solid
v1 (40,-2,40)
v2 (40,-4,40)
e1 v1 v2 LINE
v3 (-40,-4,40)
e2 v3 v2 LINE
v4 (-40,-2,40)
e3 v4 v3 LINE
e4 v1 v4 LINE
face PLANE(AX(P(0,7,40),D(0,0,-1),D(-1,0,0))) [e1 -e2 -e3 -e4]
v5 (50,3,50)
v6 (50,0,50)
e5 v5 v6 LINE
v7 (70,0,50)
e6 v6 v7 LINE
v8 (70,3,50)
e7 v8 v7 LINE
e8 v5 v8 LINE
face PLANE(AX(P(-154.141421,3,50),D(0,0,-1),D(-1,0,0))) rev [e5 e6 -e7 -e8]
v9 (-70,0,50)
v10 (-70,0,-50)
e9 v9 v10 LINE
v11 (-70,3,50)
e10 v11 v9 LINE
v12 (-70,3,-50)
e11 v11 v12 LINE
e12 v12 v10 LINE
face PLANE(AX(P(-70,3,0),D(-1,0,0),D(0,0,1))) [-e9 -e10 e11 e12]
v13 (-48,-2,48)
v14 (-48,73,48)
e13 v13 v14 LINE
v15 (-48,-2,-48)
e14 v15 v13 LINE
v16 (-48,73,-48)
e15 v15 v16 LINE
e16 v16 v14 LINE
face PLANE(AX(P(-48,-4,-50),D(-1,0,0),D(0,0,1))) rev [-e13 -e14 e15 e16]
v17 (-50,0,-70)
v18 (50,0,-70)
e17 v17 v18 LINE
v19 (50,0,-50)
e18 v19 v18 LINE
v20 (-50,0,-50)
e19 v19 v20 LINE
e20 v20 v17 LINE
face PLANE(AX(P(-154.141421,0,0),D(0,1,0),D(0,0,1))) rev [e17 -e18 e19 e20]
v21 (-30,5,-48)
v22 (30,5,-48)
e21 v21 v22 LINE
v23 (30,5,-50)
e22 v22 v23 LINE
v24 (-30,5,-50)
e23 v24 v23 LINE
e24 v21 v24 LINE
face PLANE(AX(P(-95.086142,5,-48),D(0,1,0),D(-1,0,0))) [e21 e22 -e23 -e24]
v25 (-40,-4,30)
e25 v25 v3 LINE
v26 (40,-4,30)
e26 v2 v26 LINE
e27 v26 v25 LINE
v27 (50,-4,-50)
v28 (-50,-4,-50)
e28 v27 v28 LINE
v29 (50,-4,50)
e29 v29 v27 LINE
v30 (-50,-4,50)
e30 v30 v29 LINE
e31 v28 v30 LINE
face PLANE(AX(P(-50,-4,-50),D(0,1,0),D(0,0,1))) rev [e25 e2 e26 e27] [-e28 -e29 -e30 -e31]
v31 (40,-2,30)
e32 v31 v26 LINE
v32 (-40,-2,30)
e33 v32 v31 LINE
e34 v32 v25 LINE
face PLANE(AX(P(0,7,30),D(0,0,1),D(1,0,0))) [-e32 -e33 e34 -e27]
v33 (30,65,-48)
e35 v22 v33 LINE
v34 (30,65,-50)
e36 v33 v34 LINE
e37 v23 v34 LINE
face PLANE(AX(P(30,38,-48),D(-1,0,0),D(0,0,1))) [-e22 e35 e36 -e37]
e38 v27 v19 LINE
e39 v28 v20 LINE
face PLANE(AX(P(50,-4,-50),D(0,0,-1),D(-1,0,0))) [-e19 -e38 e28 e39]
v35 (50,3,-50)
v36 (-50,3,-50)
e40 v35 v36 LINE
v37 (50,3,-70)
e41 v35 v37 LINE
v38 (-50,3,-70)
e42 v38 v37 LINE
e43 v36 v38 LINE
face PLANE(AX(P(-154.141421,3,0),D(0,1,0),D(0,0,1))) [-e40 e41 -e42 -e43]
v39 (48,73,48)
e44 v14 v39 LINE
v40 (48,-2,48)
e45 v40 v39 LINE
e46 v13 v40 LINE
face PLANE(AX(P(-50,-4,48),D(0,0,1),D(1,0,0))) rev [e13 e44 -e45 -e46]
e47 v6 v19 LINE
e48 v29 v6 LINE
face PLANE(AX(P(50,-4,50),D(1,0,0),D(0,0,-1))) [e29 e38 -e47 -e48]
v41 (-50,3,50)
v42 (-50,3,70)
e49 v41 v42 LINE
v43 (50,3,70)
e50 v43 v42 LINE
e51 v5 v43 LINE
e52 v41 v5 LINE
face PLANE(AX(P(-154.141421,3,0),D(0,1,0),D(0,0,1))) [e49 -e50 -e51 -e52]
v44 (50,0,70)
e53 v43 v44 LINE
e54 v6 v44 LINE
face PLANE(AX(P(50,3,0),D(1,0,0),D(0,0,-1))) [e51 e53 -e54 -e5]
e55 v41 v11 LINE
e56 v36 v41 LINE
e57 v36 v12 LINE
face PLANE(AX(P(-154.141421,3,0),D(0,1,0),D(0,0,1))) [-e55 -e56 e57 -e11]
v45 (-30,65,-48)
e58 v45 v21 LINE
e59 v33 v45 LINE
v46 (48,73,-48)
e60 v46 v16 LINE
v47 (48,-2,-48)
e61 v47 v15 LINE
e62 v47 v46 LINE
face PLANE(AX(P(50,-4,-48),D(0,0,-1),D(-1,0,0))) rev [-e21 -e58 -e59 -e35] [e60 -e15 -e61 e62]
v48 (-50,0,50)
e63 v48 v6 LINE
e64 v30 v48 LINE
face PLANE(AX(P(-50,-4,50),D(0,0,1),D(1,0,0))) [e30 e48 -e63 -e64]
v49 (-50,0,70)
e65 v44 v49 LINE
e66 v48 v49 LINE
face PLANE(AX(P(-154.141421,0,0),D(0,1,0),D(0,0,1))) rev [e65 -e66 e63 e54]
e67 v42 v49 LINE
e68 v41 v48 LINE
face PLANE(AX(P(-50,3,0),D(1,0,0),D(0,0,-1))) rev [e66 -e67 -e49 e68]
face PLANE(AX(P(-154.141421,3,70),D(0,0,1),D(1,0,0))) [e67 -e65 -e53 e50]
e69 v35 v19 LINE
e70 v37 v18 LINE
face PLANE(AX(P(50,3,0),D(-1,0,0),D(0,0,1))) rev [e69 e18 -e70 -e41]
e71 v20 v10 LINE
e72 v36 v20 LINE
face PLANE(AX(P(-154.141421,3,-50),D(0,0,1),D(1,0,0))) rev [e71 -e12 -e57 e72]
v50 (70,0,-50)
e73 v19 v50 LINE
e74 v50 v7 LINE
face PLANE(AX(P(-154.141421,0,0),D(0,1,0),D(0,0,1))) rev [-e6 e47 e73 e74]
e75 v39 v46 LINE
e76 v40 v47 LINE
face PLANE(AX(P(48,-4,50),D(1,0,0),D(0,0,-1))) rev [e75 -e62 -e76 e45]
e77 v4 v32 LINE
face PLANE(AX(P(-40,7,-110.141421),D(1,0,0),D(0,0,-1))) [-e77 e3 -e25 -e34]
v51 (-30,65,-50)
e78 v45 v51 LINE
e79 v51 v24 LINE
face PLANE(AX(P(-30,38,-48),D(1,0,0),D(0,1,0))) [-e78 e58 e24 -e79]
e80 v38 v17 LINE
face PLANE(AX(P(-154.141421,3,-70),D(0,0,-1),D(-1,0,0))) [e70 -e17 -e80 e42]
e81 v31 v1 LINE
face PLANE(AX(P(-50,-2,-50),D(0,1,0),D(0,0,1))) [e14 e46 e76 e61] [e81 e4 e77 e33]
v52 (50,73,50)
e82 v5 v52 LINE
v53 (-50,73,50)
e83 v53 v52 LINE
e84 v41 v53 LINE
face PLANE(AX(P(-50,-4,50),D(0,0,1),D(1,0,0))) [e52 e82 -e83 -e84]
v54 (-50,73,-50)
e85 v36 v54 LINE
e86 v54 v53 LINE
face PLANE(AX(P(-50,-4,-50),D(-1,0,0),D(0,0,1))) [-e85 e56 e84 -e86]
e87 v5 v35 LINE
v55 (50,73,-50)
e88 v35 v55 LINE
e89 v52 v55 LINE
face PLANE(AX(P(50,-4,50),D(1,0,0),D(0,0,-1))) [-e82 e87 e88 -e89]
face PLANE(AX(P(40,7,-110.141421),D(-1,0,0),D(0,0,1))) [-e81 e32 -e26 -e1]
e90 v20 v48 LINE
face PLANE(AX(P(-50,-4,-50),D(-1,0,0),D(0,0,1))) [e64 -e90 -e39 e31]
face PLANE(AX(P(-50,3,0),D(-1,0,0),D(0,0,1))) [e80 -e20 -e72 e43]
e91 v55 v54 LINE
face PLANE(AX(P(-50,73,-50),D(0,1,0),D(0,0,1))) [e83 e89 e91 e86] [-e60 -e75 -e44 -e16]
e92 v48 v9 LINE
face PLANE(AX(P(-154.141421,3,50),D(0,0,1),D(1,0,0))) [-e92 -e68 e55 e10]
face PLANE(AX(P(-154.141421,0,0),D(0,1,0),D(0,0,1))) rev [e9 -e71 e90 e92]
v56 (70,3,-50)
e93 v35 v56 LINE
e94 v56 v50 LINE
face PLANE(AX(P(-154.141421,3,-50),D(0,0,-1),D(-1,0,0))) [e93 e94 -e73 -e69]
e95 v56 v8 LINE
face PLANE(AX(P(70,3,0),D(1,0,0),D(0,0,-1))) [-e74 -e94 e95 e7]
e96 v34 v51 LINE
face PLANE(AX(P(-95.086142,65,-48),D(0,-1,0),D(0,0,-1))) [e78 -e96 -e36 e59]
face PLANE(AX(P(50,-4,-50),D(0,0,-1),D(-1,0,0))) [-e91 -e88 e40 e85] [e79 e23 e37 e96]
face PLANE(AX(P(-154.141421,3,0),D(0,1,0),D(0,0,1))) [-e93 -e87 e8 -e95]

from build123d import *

# Parameters (mm, degrees)
SKETCH1_W                = 20
SKETCH1_H                = 100
BOSS_EXTRUDE1_DEPTH      = 3
BOSS_EXTRUDE2_DEPTH      = 70
BOSS_EXTRUDE2_DEPTH_BACK = 7
SKETCH2_W                = 100
SKETCH2_H                = 100
SHELL1_START             = -2
SHELL1_OUTLINE_W         = 96
SHELL1_OUTLINE_H         = 96
SHELL1_DEPTH             = 75
SKETCH3_W                = 80
SKETCH3_H                = 10
CUT_EXTRUDE1_DEPTH       = 11
SKETCH6_W                = 60
SKETCH6_H                = 60
CUT_EXTRUDE2_DEPTH       = 2


# Read off the part's stored shape, not the designer's step: Shell1
with BuildPart() as part:
    # Sketch1 → Boss-Extrude1 (new body)
    with BuildSketch(Plane(origin=(0, 0, 0), x_dir=(1, 0, 0), z_dir=(0, 1, 0))):
        Polygon((0, 50), (-50, 50), (-50, -50), (0, -50), (50, -50), (50, 0), (50, 50), align=None)
        with Locations((-60, 0)):
            Rectangle(SKETCH1_W, SKETCH1_H)
        Polygon((0, -50), (-50, -50), (-50, -70), (0, -70), (50, -70), (50, -50), align=None)
        Polygon((70, 50), (50, 50), (50, 0), (50, -50), (70, -50), (70, 0), align=None)
        Polygon((-50, 70), (-50, 50), (0, 50), (50, 50), (50, 70), (0, 70), align=None)
    extrude(amount=BOSS_EXTRUDE1_DEPTH)

    # Sketch2 → Boss-Extrude2 (add, two sides: drawn at the far end of the back side and taken through both)
    with BuildSketch(Plane(origin=(0, 3, 0), x_dir=(-1, 0, 0), z_dir=(0, 1, 0)).offset(-BOSS_EXTRUDE2_DEPTH_BACK)):
        Rectangle(SKETCH2_W, SKETCH2_H)
    extrude(amount=BOSS_EXTRUDE2_DEPTH + BOSS_EXTRUDE2_DEPTH_BACK)

    # Shell1 outline → Shell1 (cut)
    with BuildSketch(Plane(origin=(0, 0, 0), x_dir=(1, 0, 0), z_dir=(0, 1, 0)).offset(SHELL1_START)):
        Rectangle(SHELL1_OUTLINE_W, SHELL1_OUTLINE_H)
    extrude(amount=SHELL1_DEPTH, mode=Mode.SUBTRACT)

    # Sketch3 → Cut-Extrude1 (cut)
    with BuildSketch(Plane.XZ.offset(4)):
        with Locations((0, 35)):
            Rectangle(SKETCH3_W, SKETCH3_H)
    extrude(amount=-CUT_EXTRUDE1_DEPTH, mode=Mode.SUBTRACT)

    # Sketch6 → Cut-Extrude2 (cut)
    with BuildSketch(Plane(origin=(0, 0, -50), x_dir=(-1, 0, 0), z_dir=(0, 0, -1))):
        with Locations((0, 35)):
            Rectangle(SKETCH6_W, SKETCH6_H)
    extrude(amount=-CUT_EXTRUDE2_DEPTH, mode=Mode.SUBTRACT)


solid = part.part
